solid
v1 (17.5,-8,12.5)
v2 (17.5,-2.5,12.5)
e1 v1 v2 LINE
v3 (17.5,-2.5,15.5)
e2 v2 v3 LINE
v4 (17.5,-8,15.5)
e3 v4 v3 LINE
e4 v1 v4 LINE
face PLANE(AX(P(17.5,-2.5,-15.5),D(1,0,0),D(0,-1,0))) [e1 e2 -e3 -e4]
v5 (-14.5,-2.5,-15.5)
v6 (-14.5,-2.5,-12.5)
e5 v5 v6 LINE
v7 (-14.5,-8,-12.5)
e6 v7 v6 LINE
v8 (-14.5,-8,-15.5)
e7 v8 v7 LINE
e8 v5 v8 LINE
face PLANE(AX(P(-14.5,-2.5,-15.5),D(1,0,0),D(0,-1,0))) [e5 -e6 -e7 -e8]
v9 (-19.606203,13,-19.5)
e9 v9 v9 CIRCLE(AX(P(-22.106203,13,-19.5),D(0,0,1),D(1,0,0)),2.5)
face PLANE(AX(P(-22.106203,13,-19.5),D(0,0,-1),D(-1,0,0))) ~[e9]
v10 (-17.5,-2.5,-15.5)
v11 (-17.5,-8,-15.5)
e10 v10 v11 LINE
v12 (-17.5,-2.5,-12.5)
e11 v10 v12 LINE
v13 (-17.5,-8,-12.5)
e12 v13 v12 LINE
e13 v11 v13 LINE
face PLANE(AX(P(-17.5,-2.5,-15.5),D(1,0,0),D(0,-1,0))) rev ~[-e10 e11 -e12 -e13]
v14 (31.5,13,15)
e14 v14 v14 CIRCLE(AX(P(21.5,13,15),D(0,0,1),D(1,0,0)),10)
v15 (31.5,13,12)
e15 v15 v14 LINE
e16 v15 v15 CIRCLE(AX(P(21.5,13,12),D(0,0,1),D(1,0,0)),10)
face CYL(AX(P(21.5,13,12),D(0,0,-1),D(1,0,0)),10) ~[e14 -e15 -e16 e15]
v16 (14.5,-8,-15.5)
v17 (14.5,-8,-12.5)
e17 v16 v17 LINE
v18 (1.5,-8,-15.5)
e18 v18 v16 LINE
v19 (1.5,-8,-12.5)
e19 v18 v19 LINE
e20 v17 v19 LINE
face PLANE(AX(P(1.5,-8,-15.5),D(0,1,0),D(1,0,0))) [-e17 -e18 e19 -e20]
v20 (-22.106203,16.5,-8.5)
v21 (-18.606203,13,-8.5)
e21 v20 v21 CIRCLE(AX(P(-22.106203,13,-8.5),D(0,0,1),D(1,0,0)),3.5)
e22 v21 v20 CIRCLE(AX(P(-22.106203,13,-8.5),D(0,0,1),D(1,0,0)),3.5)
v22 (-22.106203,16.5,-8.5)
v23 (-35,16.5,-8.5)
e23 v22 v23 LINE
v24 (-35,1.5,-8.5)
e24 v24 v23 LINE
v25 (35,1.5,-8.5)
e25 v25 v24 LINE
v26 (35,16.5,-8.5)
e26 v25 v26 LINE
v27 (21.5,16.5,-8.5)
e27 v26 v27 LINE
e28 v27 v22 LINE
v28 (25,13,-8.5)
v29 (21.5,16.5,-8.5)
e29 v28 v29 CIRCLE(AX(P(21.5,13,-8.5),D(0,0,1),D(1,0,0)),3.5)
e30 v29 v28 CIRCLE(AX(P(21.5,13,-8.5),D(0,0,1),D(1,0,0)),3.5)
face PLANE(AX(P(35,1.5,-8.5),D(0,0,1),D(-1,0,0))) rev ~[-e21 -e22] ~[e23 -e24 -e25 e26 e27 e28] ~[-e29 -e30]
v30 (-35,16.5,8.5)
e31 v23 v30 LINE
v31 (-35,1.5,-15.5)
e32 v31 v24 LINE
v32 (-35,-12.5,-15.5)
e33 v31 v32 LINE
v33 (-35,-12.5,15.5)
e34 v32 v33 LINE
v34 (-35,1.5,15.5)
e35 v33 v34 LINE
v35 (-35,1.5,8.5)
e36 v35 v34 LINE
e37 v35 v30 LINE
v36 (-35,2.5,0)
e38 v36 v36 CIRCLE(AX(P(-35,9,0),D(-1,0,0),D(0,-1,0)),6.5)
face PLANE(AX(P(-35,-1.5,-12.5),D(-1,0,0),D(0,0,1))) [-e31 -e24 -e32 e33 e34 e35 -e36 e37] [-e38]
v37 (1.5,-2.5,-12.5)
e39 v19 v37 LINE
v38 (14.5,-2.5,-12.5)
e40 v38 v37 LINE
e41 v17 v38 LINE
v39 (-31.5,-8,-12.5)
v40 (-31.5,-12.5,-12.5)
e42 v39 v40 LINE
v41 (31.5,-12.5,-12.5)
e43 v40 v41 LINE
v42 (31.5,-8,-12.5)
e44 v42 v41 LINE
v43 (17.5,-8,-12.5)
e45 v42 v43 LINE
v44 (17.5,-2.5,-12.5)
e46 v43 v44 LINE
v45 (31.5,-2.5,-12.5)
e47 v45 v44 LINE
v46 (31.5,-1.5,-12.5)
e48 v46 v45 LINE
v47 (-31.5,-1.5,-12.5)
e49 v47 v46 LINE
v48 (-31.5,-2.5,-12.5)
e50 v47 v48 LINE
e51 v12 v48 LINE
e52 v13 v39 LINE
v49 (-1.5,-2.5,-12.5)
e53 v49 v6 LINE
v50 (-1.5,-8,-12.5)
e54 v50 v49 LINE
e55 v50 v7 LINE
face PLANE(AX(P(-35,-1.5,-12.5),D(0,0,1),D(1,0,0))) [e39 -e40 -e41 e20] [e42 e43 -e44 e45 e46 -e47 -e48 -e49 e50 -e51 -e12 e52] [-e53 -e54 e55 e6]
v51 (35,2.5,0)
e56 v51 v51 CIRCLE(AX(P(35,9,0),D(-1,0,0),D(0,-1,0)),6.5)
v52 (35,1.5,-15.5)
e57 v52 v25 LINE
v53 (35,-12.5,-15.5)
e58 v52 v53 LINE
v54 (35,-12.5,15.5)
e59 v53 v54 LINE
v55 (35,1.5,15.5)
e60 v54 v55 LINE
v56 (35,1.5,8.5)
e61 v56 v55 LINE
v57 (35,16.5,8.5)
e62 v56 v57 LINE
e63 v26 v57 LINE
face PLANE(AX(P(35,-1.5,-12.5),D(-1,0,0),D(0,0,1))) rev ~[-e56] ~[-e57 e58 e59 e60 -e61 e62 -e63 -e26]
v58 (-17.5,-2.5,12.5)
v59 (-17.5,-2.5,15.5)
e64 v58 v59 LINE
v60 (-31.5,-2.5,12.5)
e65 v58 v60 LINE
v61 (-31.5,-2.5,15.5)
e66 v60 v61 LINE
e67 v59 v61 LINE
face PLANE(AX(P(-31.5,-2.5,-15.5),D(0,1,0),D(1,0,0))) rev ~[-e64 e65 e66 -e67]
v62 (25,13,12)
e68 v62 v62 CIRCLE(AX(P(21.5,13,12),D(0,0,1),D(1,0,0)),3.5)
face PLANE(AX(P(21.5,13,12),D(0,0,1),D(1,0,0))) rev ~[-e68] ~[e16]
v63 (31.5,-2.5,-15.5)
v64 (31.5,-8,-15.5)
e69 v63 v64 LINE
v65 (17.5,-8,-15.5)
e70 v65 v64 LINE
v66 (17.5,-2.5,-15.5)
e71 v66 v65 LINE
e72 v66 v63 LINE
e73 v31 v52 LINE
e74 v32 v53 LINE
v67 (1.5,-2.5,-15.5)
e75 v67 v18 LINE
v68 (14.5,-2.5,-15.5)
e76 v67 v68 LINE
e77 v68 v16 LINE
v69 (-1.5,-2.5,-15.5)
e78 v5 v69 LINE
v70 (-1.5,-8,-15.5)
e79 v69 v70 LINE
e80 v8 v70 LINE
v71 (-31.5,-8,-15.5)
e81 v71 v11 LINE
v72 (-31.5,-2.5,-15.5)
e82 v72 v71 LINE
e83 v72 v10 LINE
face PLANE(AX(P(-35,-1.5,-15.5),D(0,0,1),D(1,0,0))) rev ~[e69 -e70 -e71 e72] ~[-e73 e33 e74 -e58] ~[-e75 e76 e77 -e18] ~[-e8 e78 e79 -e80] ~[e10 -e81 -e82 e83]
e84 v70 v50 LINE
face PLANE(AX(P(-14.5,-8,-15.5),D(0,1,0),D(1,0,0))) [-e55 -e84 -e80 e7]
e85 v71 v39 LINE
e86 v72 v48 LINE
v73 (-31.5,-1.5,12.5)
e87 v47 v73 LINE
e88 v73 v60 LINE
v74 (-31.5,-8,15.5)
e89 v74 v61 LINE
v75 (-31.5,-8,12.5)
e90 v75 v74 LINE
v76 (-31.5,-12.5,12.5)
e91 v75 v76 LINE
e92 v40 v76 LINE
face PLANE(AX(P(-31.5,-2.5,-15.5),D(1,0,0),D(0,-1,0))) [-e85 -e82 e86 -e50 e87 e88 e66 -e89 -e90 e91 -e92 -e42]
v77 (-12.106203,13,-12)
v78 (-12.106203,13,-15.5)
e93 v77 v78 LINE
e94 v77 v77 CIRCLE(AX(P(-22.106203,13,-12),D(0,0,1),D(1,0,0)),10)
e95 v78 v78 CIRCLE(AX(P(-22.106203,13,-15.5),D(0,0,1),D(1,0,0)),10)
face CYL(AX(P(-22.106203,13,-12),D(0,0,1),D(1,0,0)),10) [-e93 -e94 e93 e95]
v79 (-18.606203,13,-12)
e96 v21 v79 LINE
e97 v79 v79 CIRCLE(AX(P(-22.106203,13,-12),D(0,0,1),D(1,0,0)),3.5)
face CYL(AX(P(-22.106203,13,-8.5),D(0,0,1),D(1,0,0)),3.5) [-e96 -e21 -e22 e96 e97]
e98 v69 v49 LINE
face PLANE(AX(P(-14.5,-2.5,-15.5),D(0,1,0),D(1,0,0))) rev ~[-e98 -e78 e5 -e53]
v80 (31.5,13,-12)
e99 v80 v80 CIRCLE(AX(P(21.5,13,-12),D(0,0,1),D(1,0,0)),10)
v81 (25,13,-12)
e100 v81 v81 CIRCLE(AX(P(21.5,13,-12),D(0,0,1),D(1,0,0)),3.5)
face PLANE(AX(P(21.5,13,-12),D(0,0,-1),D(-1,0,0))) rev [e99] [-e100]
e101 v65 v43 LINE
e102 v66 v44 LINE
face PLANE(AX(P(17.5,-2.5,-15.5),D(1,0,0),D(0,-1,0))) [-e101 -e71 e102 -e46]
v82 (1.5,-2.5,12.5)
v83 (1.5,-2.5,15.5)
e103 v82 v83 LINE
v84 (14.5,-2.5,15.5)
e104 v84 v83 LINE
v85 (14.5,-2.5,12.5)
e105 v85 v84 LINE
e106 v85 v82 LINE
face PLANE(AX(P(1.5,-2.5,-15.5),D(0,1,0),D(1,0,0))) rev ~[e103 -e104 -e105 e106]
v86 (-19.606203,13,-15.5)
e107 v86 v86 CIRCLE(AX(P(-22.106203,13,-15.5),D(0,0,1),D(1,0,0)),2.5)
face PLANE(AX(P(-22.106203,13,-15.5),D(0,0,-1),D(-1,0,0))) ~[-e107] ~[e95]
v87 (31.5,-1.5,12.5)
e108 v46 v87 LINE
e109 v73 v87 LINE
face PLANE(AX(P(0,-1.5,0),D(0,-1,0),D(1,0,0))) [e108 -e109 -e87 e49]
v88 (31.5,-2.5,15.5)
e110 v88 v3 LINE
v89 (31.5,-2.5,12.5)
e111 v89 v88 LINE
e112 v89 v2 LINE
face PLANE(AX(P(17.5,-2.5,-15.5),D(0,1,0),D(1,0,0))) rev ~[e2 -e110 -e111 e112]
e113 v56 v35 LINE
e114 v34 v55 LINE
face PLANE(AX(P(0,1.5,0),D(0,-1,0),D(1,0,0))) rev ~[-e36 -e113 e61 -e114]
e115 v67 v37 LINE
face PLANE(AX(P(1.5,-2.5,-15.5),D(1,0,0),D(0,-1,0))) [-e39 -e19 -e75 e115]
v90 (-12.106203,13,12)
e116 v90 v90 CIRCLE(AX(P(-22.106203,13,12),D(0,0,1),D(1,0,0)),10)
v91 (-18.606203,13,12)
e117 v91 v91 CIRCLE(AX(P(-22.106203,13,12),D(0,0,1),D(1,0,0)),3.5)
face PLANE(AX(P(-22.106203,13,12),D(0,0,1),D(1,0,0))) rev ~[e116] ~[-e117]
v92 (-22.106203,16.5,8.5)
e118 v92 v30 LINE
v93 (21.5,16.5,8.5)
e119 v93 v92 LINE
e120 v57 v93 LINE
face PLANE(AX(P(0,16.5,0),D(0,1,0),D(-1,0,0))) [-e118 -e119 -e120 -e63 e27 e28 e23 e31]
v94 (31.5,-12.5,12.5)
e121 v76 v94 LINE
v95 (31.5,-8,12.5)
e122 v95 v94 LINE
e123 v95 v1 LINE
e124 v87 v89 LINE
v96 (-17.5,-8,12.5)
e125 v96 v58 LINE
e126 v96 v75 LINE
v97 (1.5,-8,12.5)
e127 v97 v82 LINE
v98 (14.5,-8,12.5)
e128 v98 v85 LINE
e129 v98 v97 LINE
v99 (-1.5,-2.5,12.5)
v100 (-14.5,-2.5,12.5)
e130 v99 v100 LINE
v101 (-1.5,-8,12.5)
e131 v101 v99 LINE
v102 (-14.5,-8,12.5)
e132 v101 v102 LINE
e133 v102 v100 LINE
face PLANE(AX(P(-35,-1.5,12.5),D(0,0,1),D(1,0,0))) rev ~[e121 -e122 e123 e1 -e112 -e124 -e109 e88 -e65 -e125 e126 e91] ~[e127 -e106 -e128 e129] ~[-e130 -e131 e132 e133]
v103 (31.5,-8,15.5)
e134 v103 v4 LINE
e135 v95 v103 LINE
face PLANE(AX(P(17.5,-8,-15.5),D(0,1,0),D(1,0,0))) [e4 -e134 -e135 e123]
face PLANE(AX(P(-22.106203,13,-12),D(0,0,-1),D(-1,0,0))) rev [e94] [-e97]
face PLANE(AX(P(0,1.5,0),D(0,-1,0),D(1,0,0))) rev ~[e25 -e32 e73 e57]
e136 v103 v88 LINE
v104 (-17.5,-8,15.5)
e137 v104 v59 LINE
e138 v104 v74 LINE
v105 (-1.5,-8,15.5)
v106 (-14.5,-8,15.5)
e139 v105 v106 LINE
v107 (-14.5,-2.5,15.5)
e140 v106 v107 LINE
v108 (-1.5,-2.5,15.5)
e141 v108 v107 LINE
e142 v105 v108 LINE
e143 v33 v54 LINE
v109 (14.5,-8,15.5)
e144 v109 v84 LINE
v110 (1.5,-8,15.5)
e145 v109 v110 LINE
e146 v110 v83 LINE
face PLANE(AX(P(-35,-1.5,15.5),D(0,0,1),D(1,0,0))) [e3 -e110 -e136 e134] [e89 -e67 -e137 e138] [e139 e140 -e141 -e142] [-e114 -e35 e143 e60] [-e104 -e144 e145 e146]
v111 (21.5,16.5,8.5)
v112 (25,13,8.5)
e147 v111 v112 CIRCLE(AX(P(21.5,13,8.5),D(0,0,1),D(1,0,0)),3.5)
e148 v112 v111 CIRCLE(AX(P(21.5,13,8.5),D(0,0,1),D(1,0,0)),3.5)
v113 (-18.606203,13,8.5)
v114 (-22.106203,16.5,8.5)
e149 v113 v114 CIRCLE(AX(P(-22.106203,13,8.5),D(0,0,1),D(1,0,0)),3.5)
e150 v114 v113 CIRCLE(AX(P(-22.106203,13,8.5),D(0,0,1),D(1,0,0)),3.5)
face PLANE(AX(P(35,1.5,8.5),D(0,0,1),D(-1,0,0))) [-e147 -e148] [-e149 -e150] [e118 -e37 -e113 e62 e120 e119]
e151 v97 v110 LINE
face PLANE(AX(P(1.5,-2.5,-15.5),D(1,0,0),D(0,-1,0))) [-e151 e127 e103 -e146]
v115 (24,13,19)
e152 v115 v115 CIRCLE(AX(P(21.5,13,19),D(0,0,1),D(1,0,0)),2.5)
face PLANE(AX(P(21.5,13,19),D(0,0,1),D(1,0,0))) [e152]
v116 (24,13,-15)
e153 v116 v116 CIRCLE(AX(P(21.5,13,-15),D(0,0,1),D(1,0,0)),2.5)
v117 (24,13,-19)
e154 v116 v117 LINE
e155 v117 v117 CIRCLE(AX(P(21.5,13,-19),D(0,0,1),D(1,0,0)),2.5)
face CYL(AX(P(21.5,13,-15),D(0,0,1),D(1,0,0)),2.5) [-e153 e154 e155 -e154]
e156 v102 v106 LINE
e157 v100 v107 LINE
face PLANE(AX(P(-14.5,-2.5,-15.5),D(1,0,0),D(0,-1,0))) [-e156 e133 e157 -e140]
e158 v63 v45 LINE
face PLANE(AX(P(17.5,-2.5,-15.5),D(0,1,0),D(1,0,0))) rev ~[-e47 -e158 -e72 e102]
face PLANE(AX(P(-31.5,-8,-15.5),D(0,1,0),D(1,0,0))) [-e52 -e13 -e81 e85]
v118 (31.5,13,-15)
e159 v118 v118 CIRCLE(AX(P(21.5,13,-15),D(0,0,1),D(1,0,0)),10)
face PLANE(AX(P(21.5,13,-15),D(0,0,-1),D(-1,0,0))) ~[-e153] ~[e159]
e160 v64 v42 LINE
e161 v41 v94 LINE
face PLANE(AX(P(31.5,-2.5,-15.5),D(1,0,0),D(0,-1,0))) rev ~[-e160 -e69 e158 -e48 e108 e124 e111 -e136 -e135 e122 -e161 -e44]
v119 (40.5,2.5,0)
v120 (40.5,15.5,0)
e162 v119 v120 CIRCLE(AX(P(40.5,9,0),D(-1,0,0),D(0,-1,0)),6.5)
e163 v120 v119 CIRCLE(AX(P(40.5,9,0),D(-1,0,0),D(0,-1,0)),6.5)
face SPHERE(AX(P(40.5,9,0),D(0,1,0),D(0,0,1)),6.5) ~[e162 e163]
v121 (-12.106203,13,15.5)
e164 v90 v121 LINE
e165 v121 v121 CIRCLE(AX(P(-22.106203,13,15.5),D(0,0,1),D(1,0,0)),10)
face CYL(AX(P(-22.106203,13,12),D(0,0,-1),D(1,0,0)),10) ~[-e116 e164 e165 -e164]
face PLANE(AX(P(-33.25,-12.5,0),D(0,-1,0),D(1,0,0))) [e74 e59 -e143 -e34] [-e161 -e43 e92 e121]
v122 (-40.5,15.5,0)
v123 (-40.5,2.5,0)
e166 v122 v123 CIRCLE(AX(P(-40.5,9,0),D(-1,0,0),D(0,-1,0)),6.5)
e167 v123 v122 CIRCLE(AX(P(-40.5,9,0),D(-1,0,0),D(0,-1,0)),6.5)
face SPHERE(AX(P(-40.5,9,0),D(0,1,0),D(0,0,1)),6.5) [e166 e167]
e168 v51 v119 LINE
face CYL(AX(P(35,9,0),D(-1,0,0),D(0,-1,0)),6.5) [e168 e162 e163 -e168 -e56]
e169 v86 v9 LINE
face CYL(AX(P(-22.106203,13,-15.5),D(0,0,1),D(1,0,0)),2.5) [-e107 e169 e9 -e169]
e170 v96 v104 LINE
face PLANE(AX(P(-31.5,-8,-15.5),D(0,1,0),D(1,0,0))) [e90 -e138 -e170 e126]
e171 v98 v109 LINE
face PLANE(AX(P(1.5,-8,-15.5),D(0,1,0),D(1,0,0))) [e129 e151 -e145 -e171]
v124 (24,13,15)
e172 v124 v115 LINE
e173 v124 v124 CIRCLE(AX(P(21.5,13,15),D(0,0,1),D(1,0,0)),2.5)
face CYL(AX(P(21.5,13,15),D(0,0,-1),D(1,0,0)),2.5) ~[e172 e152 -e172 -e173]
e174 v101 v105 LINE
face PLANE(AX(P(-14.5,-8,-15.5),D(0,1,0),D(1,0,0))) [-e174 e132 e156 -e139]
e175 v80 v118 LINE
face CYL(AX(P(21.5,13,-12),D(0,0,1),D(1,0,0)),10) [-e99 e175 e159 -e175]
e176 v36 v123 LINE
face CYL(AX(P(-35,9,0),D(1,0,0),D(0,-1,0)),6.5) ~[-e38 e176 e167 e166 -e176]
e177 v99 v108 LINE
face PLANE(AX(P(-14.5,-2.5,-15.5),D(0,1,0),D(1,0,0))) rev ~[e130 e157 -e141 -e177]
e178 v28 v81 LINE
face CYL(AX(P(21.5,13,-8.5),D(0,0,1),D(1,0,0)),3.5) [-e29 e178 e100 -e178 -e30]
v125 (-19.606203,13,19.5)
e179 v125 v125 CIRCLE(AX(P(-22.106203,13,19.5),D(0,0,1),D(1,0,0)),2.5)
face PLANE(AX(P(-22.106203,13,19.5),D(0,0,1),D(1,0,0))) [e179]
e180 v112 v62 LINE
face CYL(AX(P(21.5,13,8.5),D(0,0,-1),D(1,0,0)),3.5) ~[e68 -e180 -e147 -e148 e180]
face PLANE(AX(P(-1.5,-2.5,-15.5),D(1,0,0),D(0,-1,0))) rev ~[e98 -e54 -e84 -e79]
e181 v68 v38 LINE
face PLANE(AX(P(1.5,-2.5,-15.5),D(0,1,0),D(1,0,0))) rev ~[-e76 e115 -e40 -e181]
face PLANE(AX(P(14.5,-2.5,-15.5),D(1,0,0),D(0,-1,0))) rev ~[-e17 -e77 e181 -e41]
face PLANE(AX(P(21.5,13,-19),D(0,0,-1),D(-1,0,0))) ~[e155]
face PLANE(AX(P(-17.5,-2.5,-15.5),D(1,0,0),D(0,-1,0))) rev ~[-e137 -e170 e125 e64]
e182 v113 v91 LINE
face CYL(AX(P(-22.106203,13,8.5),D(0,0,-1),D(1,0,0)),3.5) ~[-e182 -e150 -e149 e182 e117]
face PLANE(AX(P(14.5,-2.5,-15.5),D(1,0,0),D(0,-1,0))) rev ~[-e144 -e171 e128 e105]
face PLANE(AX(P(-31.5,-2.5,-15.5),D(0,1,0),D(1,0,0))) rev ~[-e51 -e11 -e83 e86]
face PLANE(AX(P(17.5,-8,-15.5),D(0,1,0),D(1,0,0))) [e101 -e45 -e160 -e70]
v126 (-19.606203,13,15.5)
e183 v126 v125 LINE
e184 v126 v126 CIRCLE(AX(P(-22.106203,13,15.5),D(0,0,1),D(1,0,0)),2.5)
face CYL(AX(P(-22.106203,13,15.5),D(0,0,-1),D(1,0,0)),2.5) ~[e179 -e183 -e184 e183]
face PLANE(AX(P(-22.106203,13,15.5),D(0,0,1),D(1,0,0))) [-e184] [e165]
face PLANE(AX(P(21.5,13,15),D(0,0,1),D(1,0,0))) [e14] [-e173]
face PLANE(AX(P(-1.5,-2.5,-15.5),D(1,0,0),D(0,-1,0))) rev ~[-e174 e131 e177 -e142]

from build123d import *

# Parameters (mm, degrees)
F0_W      = 70
F0_H      = 31
F1_DEPTH  = 1.5
F2_W      = 70
F2_H      = 3
F3_DEPTH  = 11
F4_W      = 70
F4_H      = 3
F5_DEPTH  = 11
F6_W      = 3.5
F6_H      = 25
F7_DEPTH  = 11
F8_W      = 3.5
F8_H      = 25
F9_DEPTH  = 11
F10_W     = 70
F10_H     = 17
F11_DEPTH = 15
F12_W     = 14
F12_H     = 5.5
F13_DEPTH = 70
F14_W     = 13
F14_H     = 5.5
F15_DEPTH = 70
F16_W     = 13
F16_H     = 5.5
F17_DEPTH = 70
F18_W     = 14
F18_H     = 5.5
F19_DEPTH = 70
F21_R     = 3.5
F22_DEPTH = 3.5
F23_R     = 3.5
F24_DEPTH = 3.5
F25_R     = 10
F26_DEPTH = 3
F27_R     = 10
F28_DEPTH = 3.5
F29_R     = 2.5
F30_DEPTH = 4
F31_R     = 2.5
F32_DEPTH = 4
F33_R     = 6.5
F34_DEPTH = 5.5


# Not quite as in the source:
# - a pattern or mirror of a feature is missing from the dataset's text; its kind, count and spacing are read off the source's solid


with BuildPart() as f1:
    # F0 (on Front) → F1 (new body, symmetric)
    with BuildSketch(Plane.XZ):
        Rectangle(F0_W, F0_H)
    extrude(amount=F1_DEPTH, both=True)

    # F2 (on face) → F3 (join)
    with BuildSketch(Plane.XZ.offset(1.5)):
        with Locations((0, -14)):
            Rectangle(F2_W, F2_H)
    extrude(amount=F3_DEPTH)

    # F4 (on face) → F5 (join)
    with BuildSketch(Plane.XZ.offset(1.5)):
        with Locations((0, 14)):
            Rectangle(F4_W, F4_H)
    extrude(amount=F5_DEPTH)

    # F6 (on face) → F7 (join)
    with BuildSketch(Plane.XZ.offset(1.5)):
        with Locations((33.25, 0)):
            Rectangle(F6_W, F6_H)
    extrude(amount=F7_DEPTH)

    # F8 (on face) → F9 (join)
    with BuildSketch(Plane.XZ.offset(1.5)):
        with Locations((-33.25, 0)):
            Rectangle(F8_W, F8_H)
    extrude(amount=F9_DEPTH)

    # F10 (on face) → F11 (join)
    with BuildSketch(Plane(origin=(0, 1.5, 0), x_dir=(-1, 0, 0), z_dir=(0, 1, 0))):
        Rectangle(F10_W, F10_H)
    extrude(amount=F11_DEPTH)

    # F12 (on face) → F13 (cut)
    with BuildSketch(Plane(origin=(0, 0, -15.5), x_dir=(1, 0, 0), z_dir=(0, 0, -1))):
        with Locations((24.5, 5.25)):
            Rectangle(F12_W, F12_H)
    extrude(amount=-F13_DEPTH, mode=Mode.SUBTRACT)

    # F14 (on face) → F15 (cut)
    with BuildSketch(Plane(origin=(0, 0, -15.5), x_dir=(1, 0, 0), z_dir=(0, 0, -1))):
        with Locations((8, 5.25)):
            Rectangle(F14_W, F14_H)
    extrude(amount=-F15_DEPTH, mode=Mode.SUBTRACT)

    # F16 (on face) → F17 (cut)
    with BuildSketch(Plane(origin=(0, 0, -15.5), x_dir=(1, 0, 0), z_dir=(0, 0, -1))):
        with Locations((-8, 5.25)):
            Rectangle(F16_W, F16_H)
    extrude(amount=-F17_DEPTH, mode=Mode.SUBTRACT)

    # F18 (on face) → F19 (cut)
    with BuildSketch(Plane(origin=(0, 0, -15.5), x_dir=(1, 0, 0), z_dir=(0, 0, -1))):
        with Locations((-24.5, 5.25)):
            Rectangle(F18_W, F18_H)
    extrude(amount=-F19_DEPTH, mode=Mode.SUBTRACT)

    # F21 (on face) → F22 (join)
    with BuildSketch(Plane.XY.offset(8.5)):
        with Locations((21.5, 13)):
            Circle(F21_R)
    f22 = extrude(amount=F22_DEPTH)

    # F22_copies: F22 across plane
    add(f22.mirror(Plane(origin=(0, 0, 0), x_dir=(-1, 0, 0), z_dir=(0, 0, -1))))

    # F23 (on face) → F24 (join)
    with BuildSketch(Plane.XY.offset(8.5)):
        with Locations((-22.1062030418, 13)):
            Circle(F23_R)
    f24 = extrude(amount=F24_DEPTH)

    # F24_copies: F24 across plane
    add(f24.mirror(Plane(origin=(0, 0, 0), x_dir=(-1, 0, 0), z_dir=(0, 0, -1))))

    # F25 (on face) → F26 (join)
    with BuildSketch(Plane.XY.offset(12)):
        with Locations((21.5, 13)):
            Circle(F25_R)
    f26 = extrude(amount=F26_DEPTH)

    # F26_copies: F26 across plane
    add(f26.mirror(Plane(origin=(0, 0, 0), x_dir=(-1, 0, 0), z_dir=(0, 0, -1))))

    # F27 (on face) → F28 (join)
    with BuildSketch(Plane.XY.offset(12)):
        with Locations((-22.1062030418, 13)):
            Circle(F27_R)
    f28 = extrude(amount=F28_DEPTH)

    # F28_copies: F28 across plane
    add(f28.mirror(Plane(origin=(0, 0, 0), x_dir=(-1, 0, 0), z_dir=(0, 0, -1))))

    # F29 (on face) → F30 (join)
    with BuildSketch(Plane.XY.offset(15.5)):
        with Locations((-22.1062030418, 13)):
            Circle(F29_R)
    f30 = extrude(amount=F30_DEPTH)

    # F30_copies: F30 across plane
    add(f30.mirror(Plane(origin=(0, 0, 0), x_dir=(-1, 0, 0), z_dir=(0, 0, -1))))

    # F31 (on face) → F32 (join)
    with BuildSketch(Plane.XY.offset(15)):
        with Locations((21.5, 13)):
            Circle(F31_R)
    f32 = extrude(amount=F32_DEPTH)

    # F32_copies: F32 across plane
    add(f32.mirror(Plane(origin=(0, 0, 0), x_dir=(-1, 0, 0), z_dir=(0, 0, -1))))

    # F33 (on face) → F34 (join)
    with BuildSketch(Plane(origin=(-35, 0, 0), x_dir=(0, -1, 0), z_dir=(-1, 0, 0))):
        with Locations((-9, 0)):
            Circle(F33_R)
    f34 = extrude(amount=F34_DEPTH)

    # F34_copies: F34 across plane
    add(f34.mirror(Plane(origin=(0, 0, 0), x_dir=(0, 0, 1), z_dir=(1, 0, 0))))

    # F35 (on face) → F36 (revolve)
    with BuildSketch(Plane(origin=(-40.5, 0, 0), x_dir=(0, -1, 0), z_dir=(-1, 0, 0))):
        with BuildLine():
            Line((-15.5, 0), (-9, 0))
            Line((-9, 0), (-2.5, 0))
            ThreePointArc((-2.5, 0), (-9, 6.5), (-15.5, 0))
        make_face()
    f36 = revolve(axis=Axis((-40.5, 9, 0), (0, 1, 0)))

    # F36_copies: F36 across plane
    add(f36.mirror(Plane(origin=(0, 0, 0), x_dir=(0, 0, 1), z_dir=(1, 0, 0))))


solid = f1.part
